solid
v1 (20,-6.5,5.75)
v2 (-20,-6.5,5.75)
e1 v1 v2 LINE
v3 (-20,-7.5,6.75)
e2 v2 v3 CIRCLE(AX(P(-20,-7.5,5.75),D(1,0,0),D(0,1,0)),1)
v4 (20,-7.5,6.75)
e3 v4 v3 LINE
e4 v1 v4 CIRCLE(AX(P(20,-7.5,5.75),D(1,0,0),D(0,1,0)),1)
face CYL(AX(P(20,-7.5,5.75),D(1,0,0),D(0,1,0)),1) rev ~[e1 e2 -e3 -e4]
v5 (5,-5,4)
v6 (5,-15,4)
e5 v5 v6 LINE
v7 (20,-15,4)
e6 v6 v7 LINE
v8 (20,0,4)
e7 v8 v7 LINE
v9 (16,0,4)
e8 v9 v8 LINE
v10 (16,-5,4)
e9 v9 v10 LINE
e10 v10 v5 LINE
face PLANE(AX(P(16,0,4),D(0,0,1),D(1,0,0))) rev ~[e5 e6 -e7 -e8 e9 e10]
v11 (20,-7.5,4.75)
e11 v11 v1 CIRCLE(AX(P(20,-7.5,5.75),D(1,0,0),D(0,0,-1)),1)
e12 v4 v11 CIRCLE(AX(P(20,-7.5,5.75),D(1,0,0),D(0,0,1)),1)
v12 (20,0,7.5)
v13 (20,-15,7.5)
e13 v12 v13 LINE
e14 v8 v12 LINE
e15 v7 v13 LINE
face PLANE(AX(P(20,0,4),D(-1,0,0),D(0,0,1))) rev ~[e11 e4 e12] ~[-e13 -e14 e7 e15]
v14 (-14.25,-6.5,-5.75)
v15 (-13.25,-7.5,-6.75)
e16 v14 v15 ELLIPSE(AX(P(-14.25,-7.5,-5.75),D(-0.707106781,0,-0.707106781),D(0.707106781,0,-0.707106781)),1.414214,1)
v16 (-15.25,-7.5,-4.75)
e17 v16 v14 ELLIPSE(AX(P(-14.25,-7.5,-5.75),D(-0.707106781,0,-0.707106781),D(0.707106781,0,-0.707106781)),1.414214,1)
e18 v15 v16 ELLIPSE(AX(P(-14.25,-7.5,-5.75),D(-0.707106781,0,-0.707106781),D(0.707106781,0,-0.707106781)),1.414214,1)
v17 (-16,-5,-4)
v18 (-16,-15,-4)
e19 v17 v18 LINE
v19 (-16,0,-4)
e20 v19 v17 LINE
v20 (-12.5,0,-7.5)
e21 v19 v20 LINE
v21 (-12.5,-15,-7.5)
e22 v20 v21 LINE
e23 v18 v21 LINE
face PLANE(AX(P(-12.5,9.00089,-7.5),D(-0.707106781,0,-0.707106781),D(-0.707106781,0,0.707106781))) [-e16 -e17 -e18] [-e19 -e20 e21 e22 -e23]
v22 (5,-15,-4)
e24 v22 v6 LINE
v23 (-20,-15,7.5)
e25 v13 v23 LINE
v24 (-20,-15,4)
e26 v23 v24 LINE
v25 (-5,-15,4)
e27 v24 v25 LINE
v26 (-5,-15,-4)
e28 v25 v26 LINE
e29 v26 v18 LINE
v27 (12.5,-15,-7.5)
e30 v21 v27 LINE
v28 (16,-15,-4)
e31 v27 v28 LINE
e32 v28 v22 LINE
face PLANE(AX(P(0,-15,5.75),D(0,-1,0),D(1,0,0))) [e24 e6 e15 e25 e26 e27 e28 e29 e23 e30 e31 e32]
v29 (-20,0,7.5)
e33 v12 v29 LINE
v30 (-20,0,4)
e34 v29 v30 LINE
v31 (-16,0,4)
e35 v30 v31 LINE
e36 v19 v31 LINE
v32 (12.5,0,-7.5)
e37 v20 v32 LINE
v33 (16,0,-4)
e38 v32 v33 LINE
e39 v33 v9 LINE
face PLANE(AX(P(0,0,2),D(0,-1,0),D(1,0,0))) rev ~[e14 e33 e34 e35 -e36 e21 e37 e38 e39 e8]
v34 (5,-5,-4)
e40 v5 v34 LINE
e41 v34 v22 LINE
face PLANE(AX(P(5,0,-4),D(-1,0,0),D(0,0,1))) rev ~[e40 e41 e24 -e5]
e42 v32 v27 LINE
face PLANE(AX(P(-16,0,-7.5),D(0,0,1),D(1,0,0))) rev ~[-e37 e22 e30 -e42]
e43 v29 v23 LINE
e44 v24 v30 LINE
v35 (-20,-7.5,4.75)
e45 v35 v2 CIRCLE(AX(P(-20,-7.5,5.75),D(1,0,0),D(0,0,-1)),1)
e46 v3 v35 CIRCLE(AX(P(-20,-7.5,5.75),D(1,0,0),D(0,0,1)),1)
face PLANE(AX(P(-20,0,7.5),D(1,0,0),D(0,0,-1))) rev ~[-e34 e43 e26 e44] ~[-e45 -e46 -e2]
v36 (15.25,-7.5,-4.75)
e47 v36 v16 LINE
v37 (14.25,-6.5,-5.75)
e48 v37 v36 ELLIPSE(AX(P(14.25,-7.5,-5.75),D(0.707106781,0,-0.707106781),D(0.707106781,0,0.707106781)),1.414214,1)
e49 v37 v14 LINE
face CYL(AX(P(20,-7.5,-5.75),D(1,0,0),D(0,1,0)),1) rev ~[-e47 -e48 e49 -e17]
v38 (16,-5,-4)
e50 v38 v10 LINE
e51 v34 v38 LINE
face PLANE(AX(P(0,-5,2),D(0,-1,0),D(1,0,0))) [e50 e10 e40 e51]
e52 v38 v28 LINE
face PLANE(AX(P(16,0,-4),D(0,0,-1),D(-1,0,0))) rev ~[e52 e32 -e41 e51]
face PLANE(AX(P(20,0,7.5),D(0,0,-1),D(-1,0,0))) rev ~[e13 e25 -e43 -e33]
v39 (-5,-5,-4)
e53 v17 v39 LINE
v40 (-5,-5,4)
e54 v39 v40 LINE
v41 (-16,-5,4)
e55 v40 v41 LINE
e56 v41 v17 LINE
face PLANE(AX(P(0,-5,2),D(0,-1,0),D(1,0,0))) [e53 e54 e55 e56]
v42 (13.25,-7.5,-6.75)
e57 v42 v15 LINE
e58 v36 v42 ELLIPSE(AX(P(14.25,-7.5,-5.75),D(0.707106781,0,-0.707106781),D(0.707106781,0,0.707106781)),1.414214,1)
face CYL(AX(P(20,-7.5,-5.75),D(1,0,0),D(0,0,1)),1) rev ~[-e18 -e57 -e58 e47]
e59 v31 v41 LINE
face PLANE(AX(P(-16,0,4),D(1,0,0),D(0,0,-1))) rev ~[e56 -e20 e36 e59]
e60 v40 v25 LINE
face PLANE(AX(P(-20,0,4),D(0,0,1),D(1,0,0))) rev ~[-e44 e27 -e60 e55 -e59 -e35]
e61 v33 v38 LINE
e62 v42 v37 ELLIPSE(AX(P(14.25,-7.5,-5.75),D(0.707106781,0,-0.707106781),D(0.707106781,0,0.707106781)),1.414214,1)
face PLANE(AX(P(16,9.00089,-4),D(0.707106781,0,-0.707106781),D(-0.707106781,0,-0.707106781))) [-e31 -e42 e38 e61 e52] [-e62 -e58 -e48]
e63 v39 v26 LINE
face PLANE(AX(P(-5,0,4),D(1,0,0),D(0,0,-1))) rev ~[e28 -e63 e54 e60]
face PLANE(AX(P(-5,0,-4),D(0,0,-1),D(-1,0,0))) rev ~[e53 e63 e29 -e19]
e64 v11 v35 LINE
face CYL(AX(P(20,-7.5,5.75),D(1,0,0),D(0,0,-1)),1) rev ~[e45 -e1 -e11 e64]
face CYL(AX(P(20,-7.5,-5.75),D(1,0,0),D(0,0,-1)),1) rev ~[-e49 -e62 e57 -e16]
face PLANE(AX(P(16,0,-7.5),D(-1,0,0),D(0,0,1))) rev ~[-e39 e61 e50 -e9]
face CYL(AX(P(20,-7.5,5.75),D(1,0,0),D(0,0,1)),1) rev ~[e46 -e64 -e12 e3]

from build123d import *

# Parameters (mm, degrees)
F0_W        = 10
F0_H        = 4
F0_W_2      = 11
F1_DEPTH    = 5
F2_DEPTH    = 15
F4_DEPTH    = 40
F5_T1_DEPTH = 33.0017809158


# Not quite as in the source:
# - a fillet or chamfer that OpenCascade refuses, or shapes differently, is made with other operations: its cross-section is extruded or revolved along the edge and cut away or added


with BuildPart() as f1:
    # F0 (on Front) → F1 (new body)
    with BuildSketch(Plane.XZ):
        with Locations((0, 2)):
            Rectangle(F0_W, F0_H)
        with Locations((0, -2)):
            Rectangle(F0_W, F0_H)
        Polygon((16, -4), (5, -4), (-5, -4), (-16, -4), (-16, -7.5), (16, -7.5), align=None)
        Polygon((-5, 4), (5, 4), (16, 4), (20, 4), (20, 7.5), (-20, 7.5), (-20, 4), (-16, 4), align=None)
        with Locations((-10.5, -2)):
            Rectangle(F0_W_2, F0_H)
        with Locations((10.5, -2)):
            Rectangle(F0_W_2, F0_H)
        with Locations((10.5, 2)):
            Rectangle(F0_W_2, F0_H)
        with Locations((-10.5, 2)):
            Rectangle(F0_W_2, F0_H)
    extrude(amount=F1_DEPTH)

    # F0 (on Front) → F2 (join)
    with BuildSketch(Plane.XZ):
        Polygon((-5, 4), (5, 4), (16, 4), (20, 4), (20, 7.5), (-20, 7.5), (-20, 4), (-16, 4), align=None)
        with Locations((0, 2)):
            Rectangle(F0_W, F0_H)
        with Locations((0, -2)):
            Rectangle(F0_W, F0_H)
        Polygon((16, -4), (5, -4), (-5, -4), (-16, -4), (-16, -7.5), (16, -7.5), align=None)
    extrude(amount=F2_DEPTH)

    # F3 (on face) → F4 (cut)
    with BuildSketch(Plane.YZ.offset(20)):
        with BuildLine():
            ThreePointArc((-6.5, -5.75), (-6.7928932188, -5.0428932188), (-7.5, -4.75))
            Line((-7.5, -4.75), (-7.5, -6.75))
            ThreePointArc((-7.5, -6.75), (-6.7928932188, -6.4571067812), (-6.5, -5.75))
        make_face()
        with BuildLine():
            Line((-7.5, -6.75), (-7.5, -4.75))
            ThreePointArc((-7.5, -4.75), (-8.5, -5.75), (-7.5, -6.75))
        make_face()
        with BuildLine():
            ThreePointArc((-7.5, 6.75), (-8.5, 5.75), (-7.5, 4.75))
            Line((-7.5, 4.75), (-7.5, 6.75))
        make_face()
        with BuildLine():
            Line((-7.5, 6.75), (-7.5, 4.75))
            ThreePointArc((-7.5, 4.75), (-6.7928932188, 5.0428932188), (-6.5, 5.75))
            ThreePointArc((-6.5, 5.75), (-6.7928932188, 6.4571067812), (-7.5, 6.75))
        make_face()
    extrude(amount=-F4_DEPTH, mode=Mode.SUBTRACT)

    # F5: chamfer of 3.5 on 2 edges, made by hand

    # F5_s2 → F5_t1 (cut)
    with BuildSketch(Plane.XZ.offset(-9.0008904579)):
        Polygon((-12.5, -7.5), (-16, -4), (-16, -7.5), align=None)
        Polygon((16, -4), (12.5, -7.5), (16, -7.5), align=None)
    extrude(amount=F5_T1_DEPTH, mode=Mode.SUBTRACT)


solid = f1.part
